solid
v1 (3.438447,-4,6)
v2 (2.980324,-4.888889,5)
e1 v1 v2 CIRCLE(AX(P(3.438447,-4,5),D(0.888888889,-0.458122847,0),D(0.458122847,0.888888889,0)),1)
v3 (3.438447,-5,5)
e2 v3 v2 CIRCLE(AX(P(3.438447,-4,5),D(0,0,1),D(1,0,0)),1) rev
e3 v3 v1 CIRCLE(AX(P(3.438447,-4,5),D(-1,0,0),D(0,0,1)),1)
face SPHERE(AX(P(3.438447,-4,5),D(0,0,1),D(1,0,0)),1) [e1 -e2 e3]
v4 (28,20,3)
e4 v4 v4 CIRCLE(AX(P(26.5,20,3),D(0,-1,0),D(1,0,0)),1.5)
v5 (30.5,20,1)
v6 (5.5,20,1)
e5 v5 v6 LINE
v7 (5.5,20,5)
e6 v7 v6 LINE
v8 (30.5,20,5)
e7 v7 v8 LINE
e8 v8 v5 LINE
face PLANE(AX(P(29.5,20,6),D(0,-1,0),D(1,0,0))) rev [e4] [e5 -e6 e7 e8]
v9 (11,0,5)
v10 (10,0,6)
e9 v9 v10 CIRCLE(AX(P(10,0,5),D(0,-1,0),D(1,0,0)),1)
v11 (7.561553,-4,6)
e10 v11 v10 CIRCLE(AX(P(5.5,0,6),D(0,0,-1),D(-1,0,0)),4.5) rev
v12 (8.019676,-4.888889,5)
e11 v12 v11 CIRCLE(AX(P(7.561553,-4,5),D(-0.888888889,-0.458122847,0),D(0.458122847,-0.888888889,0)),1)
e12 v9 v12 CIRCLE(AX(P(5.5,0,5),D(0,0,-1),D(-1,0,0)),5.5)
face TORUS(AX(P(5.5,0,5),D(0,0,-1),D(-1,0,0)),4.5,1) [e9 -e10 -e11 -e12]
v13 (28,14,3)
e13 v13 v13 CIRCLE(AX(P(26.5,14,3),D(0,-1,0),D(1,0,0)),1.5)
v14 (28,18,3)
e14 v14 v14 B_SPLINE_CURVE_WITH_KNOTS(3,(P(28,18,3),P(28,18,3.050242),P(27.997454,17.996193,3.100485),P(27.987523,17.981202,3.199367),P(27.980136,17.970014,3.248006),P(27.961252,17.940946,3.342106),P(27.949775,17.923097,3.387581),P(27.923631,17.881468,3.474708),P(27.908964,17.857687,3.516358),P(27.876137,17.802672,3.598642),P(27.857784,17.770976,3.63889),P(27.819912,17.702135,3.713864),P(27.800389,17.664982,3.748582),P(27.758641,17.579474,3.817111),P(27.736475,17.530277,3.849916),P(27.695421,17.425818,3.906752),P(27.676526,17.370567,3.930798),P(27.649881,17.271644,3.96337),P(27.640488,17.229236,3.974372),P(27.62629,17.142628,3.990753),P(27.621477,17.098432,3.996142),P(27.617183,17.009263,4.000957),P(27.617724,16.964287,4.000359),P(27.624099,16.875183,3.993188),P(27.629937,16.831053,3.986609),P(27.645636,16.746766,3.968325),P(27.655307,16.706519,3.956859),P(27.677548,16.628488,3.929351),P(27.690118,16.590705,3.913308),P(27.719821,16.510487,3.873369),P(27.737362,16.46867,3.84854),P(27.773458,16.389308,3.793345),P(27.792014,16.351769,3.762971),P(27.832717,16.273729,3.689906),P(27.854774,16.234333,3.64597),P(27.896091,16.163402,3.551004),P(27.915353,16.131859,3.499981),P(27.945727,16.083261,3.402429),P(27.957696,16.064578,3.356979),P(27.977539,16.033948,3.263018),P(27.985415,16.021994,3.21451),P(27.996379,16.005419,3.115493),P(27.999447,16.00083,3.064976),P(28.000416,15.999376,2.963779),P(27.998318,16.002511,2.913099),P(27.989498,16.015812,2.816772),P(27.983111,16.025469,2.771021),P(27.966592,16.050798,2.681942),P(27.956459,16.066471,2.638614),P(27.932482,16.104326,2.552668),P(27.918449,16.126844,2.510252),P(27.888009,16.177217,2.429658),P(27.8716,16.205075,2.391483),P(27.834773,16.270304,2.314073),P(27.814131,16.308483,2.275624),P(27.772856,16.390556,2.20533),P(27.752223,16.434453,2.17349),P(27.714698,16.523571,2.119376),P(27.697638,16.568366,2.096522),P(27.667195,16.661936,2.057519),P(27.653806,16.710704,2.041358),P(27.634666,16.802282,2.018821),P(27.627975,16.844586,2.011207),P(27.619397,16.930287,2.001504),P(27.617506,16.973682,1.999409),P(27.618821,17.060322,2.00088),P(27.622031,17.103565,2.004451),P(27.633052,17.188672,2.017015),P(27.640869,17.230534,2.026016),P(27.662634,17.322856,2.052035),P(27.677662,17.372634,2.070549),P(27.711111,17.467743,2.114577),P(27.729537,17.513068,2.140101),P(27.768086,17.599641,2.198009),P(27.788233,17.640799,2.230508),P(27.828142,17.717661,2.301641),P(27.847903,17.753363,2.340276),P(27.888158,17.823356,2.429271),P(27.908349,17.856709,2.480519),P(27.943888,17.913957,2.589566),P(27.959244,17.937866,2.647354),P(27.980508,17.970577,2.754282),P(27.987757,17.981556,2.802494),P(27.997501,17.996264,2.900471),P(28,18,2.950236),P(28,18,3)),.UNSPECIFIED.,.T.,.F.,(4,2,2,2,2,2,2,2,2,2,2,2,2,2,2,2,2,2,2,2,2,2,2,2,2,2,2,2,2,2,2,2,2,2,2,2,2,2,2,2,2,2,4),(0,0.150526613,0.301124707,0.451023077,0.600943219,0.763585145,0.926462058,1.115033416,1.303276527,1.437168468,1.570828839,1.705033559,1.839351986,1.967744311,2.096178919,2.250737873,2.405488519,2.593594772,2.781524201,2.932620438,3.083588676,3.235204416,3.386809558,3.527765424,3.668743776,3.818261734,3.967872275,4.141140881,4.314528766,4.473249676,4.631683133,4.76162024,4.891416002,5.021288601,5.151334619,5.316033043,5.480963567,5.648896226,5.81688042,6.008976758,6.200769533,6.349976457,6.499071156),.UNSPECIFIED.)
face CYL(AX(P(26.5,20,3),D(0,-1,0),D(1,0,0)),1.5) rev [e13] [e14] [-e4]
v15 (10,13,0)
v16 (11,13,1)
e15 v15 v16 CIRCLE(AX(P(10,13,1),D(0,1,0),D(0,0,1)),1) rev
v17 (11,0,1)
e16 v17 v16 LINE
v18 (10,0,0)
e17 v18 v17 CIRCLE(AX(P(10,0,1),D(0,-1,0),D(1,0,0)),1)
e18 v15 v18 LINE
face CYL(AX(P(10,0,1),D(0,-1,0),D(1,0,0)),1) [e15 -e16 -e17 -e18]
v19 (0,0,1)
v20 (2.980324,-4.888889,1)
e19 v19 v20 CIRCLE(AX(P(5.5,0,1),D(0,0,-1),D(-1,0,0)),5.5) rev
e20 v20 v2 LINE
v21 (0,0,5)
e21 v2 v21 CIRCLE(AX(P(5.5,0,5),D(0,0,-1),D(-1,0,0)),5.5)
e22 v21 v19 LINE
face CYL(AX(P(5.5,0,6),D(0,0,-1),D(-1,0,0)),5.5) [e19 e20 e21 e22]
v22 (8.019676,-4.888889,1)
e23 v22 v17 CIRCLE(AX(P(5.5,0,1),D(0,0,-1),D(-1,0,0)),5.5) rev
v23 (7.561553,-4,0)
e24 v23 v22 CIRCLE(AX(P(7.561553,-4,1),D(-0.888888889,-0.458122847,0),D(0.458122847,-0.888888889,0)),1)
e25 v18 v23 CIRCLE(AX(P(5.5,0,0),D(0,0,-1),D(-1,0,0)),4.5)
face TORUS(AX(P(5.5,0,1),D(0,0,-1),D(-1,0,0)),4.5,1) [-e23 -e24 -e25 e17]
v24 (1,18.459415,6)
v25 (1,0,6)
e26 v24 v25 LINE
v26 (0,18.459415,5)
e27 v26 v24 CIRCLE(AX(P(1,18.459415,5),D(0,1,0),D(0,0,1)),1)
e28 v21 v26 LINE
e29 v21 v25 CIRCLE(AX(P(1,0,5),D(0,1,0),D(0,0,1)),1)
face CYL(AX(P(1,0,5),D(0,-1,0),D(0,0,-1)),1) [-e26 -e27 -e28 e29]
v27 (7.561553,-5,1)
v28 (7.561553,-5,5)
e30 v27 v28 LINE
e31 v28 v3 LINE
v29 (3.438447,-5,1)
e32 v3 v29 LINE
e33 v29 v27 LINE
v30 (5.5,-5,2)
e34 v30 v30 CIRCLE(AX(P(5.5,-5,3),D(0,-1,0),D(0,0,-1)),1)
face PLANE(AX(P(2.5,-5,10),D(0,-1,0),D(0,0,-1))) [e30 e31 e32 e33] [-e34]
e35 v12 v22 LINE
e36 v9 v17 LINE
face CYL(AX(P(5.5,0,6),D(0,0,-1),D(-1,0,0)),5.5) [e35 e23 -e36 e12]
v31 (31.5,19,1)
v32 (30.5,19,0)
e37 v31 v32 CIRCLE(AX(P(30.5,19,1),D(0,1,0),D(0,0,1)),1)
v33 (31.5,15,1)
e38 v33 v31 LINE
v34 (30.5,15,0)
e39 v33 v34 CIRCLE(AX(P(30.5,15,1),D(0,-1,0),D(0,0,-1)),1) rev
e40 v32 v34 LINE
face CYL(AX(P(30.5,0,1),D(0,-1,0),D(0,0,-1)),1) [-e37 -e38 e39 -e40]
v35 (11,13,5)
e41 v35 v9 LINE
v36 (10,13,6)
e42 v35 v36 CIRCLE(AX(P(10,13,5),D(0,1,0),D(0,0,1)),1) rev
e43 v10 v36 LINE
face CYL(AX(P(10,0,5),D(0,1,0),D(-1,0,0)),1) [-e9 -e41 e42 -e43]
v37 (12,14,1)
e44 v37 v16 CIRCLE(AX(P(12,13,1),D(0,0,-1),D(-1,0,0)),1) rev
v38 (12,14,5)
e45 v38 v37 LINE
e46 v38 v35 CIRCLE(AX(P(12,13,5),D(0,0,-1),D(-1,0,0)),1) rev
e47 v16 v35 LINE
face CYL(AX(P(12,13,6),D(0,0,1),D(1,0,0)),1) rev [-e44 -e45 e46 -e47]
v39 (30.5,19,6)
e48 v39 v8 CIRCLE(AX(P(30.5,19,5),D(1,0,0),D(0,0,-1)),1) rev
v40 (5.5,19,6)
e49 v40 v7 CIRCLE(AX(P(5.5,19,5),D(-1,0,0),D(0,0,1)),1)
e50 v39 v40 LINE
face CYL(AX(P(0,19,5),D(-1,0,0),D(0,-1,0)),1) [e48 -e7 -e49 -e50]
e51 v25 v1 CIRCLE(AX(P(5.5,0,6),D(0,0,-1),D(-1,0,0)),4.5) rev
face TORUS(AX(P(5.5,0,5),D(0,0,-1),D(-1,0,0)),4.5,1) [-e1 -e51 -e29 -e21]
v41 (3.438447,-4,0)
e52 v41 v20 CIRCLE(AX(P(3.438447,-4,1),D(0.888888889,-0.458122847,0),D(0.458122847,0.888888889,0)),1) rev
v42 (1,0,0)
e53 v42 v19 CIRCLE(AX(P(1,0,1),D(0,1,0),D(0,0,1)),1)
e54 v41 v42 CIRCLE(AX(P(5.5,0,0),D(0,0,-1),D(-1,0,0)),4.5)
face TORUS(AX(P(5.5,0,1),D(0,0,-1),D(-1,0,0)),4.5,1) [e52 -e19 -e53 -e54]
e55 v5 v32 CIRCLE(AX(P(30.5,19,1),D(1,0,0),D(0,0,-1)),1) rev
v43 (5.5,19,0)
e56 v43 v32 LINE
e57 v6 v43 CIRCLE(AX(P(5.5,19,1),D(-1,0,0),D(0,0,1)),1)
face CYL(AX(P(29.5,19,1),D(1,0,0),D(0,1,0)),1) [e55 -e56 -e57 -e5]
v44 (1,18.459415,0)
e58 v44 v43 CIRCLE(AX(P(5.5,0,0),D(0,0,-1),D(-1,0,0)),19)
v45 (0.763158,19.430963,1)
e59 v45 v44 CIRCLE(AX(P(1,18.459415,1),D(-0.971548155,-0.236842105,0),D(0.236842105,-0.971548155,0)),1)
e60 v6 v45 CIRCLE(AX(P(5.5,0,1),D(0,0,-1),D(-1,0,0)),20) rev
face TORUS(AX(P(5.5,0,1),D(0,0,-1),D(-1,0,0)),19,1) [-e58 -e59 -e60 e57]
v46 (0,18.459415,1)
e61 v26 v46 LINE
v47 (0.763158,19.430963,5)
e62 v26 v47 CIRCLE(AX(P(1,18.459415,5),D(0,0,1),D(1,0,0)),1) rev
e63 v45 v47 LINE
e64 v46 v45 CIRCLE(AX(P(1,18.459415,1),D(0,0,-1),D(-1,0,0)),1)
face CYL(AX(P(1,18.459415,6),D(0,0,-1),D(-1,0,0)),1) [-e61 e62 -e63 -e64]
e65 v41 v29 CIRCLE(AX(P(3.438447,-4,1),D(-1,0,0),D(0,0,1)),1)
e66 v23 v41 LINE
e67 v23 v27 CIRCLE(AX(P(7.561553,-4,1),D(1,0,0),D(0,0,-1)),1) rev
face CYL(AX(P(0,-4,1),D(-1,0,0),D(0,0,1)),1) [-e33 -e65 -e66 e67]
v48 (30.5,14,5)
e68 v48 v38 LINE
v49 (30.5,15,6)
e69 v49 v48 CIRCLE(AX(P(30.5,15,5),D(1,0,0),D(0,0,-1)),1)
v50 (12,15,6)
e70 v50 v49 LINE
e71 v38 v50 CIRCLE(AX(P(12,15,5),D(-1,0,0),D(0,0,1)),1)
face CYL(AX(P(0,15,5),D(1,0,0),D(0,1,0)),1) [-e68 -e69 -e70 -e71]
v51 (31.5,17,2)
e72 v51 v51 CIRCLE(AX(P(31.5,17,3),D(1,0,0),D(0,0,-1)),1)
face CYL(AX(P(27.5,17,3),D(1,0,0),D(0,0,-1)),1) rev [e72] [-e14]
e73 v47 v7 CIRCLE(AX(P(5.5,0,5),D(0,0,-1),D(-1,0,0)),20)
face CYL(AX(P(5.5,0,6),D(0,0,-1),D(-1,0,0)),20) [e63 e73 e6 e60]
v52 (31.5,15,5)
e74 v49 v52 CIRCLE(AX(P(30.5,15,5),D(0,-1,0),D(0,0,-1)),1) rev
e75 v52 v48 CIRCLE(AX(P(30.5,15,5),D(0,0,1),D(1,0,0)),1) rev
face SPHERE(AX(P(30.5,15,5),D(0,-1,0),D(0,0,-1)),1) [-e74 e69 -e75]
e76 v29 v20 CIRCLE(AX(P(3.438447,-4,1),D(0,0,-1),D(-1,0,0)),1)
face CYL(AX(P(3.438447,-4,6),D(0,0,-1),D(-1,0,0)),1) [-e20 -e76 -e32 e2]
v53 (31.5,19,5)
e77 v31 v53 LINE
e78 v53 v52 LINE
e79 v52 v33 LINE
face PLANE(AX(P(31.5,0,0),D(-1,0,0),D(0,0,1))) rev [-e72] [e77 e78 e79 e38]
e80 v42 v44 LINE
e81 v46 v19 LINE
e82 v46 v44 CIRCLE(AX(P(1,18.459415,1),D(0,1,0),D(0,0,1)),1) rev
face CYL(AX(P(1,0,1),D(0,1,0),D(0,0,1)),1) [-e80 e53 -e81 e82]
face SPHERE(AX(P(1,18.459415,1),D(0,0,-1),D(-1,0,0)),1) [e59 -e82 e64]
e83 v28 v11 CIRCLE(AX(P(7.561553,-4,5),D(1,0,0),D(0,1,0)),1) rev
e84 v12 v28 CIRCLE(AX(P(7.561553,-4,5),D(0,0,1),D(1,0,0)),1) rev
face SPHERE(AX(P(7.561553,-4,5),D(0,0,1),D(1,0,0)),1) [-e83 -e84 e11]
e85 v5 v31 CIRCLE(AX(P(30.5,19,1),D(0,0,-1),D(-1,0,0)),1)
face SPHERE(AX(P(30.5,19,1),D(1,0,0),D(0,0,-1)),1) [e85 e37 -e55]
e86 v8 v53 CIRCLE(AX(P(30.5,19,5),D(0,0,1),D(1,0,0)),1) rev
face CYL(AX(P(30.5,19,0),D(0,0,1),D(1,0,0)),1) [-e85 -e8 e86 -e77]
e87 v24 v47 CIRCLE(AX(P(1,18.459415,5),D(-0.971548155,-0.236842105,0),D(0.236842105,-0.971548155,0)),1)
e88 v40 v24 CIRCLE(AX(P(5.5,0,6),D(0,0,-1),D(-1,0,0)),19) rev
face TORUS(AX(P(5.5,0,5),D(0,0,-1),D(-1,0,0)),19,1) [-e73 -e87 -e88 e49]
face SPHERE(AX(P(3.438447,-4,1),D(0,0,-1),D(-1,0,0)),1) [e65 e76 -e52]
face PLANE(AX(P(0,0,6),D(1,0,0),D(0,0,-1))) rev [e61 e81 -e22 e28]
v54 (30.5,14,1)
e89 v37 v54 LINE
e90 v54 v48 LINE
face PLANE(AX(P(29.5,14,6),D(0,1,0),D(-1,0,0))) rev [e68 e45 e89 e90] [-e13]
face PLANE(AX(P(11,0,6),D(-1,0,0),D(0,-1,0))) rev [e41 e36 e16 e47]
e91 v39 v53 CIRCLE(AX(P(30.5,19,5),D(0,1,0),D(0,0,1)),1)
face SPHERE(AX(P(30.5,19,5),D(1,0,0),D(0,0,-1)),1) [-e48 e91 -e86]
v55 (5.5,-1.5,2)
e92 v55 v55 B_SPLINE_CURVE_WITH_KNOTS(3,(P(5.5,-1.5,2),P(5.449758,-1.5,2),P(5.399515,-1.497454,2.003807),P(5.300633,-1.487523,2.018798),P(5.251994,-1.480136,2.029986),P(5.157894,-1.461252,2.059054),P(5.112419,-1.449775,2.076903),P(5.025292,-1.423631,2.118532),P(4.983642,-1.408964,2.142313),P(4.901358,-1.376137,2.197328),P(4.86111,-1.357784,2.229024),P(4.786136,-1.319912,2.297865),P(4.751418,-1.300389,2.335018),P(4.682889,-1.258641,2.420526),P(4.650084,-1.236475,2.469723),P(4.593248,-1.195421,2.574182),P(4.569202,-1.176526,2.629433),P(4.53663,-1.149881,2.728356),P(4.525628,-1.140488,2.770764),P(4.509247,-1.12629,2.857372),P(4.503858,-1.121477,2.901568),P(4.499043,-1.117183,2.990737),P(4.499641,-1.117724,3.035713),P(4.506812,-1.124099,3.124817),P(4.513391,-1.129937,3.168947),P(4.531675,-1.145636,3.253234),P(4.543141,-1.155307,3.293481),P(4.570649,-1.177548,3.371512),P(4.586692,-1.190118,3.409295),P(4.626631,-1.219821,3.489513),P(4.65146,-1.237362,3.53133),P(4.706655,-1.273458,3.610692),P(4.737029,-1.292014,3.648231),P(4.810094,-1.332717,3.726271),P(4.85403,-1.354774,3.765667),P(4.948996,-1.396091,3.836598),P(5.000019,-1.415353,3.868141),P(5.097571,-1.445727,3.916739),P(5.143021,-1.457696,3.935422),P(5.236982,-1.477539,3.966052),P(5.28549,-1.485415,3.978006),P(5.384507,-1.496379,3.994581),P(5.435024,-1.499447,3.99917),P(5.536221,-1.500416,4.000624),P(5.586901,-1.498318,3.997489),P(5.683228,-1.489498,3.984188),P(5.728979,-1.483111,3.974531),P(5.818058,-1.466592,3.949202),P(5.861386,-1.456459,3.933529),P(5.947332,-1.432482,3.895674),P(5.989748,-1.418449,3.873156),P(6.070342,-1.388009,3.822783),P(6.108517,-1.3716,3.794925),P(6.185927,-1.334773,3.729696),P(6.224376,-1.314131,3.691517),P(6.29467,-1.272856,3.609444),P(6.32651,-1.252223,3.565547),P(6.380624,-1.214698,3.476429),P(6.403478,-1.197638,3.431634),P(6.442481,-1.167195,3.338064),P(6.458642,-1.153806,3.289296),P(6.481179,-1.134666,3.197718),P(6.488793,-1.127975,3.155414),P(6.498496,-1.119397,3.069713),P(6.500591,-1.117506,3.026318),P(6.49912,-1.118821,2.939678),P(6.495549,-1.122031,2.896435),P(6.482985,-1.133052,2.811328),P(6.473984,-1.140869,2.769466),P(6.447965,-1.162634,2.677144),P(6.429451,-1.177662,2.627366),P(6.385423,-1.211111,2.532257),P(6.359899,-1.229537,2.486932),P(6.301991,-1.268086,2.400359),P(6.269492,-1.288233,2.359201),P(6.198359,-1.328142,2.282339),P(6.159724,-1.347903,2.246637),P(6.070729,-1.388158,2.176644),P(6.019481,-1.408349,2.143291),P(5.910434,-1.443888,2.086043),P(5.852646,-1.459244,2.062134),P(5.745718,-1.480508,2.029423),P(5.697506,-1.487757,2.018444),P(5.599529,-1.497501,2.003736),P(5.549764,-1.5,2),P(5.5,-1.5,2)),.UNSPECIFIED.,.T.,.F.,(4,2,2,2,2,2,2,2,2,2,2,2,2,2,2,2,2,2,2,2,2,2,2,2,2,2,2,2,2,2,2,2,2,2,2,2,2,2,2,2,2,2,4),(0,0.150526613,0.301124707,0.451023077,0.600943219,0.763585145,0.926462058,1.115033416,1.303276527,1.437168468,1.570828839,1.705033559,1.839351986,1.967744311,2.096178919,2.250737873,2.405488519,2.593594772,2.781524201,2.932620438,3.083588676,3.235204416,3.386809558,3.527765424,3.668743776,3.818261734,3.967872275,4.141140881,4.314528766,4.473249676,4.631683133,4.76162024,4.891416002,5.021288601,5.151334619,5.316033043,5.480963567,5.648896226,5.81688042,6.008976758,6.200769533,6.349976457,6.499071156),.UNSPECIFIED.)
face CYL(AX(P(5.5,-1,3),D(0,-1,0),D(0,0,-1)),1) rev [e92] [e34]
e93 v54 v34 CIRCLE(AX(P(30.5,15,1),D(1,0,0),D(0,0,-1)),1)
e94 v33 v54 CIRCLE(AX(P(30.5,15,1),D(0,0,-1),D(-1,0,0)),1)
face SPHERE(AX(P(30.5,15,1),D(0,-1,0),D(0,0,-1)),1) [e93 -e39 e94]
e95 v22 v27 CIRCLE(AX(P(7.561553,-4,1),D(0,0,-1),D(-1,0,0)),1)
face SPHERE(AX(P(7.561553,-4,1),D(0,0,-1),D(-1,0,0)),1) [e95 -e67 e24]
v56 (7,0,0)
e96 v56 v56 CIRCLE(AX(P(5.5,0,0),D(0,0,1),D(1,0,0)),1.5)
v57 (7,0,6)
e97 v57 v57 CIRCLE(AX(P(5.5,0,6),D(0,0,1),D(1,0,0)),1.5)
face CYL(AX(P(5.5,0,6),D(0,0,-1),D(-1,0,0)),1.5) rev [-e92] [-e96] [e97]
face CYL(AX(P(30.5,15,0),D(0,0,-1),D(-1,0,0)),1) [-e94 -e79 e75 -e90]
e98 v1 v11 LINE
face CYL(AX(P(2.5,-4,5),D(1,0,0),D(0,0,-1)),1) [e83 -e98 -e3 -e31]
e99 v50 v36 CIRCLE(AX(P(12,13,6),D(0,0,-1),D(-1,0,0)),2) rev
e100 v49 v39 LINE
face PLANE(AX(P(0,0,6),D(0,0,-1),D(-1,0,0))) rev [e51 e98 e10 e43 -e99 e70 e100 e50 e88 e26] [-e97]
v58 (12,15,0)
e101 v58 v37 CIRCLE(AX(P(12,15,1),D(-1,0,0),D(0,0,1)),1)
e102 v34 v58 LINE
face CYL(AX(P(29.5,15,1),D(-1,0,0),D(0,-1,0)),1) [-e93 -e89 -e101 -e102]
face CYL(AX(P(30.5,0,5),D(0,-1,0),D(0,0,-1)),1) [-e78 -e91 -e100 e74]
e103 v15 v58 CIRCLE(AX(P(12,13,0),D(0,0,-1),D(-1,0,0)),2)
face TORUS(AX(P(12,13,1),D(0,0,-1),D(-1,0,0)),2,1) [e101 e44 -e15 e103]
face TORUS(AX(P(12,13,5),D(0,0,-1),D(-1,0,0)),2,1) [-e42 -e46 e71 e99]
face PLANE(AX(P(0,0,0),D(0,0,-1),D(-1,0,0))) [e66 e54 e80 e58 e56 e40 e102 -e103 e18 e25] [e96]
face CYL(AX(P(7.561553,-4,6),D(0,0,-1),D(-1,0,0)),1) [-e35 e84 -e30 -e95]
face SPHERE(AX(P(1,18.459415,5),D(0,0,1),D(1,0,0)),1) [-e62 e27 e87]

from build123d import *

# Parameters (mm, degrees)
SKETCH_1_W          = 11
SKETCH_1_H          = 20
EXTRUDE_1_DEPTH     = 6
CUT_EXTRUDE_1_DEPTH = 6
SKETCH_3_R          = 5.5
EXTRUDE_2_DEPTH     = 6
SKETCH_4_W          = 24
SKETCH_4_H          = 6
EXTRUDE_3_DEPTH     = 6
SKETCH_6_R          = 1.5
CUT_EXTRUDE_3_DEPTH = 6
SKETCH_7_R          = 1.5
CUT_EXTRUDE_4_DEPTH = 6
SKETCH_5_W          = 6
SKETCH_5_H          = 0.5
CUT_EXTRUDE_5_DEPTH = 10
SKETCH_14_R         = 1
CUT_EXTRUDE_6_DEPTH = 4
SKETCH_15_W         = 6
SKETCH_15_H         = 6
EXTRUDE_4_DEPTH     = 2
SKETCH_16_R         = 1
CUT_EXTRUDE_7_DEPTH = 4
FILLET_2_R          = 1


# Read off the part's stored shape, not the designer's step: 切除-拉伸1
with BuildPart() as part:
    # 草图1 → 凸台-拉伸1 (new body)
    with BuildSketch(Plane.XY):
        with Locations((5.5, 10)):
            Rectangle(SKETCH_1_W, SKETCH_1_H)
    extrude(amount=EXTRUDE_1_DEPTH)

    # 切除-拉伸1 outline → 切除-拉伸1 (cut)
    with BuildSketch(Plane.XY):
        with BuildLine():
            Line((0, 20), (0, 19.228884523))
            ThreePointArc((0, 19.228884523), (2.723103392, 19.806282974), (5.5, 20))
            Line((5.5, 20), (0, 20))
        make_face()
        with BuildLine():
            Line((11, 20), (5.5, 20))
            ThreePointArc((5.5, 20), (8.276896608, 19.806282974), (11, 19.228884523))
            Line((11, 19.228884523), (11, 20))
        make_face()
    extrude(amount=CUT_EXTRUDE_1_DEPTH, mode=Mode.SUBTRACT)

    # 草图3 → 凸台-拉伸2 (add)
    with BuildSketch(Plane.XY):
        with Locations((5.5, 0)):
            Circle(SKETCH_3_R)
    extrude(amount=EXTRUDE_2_DEPTH)

    # 草图4 → 凸台-拉伸3 (add)
    with BuildSketch(Plane.XY):
        with Locations((17.5, 17)):
            Rectangle(SKETCH_4_W, SKETCH_4_H)
    extrude(amount=EXTRUDE_3_DEPTH)

    # 草图6 → 切除-拉伸3 (cut)
    with BuildSketch(Plane.XY):
        with Locations((5.5, 0)):
            Circle(SKETCH_6_R)
    extrude(amount=CUT_EXTRUDE_3_DEPTH, mode=Mode.SUBTRACT)

    # 草图7 → 切除-拉伸4 (cut)
    with BuildSketch(Plane.XZ.offset(-14)):
        with Locations((26.5, 3)):
            Circle(SKETCH_7_R)
    extrude(amount=-CUT_EXTRUDE_4_DEPTH, mode=Mode.SUBTRACT)

    # 草图5 → 切除-拉伸5 (cut)
    with BuildSketch(Plane.XY):
        with Locations((5.5, -5.25)):
            Rectangle(SKETCH_5_W, SKETCH_5_H)
    extrude(amount=CUT_EXTRUDE_5_DEPTH, mode=Mode.SUBTRACT)

    # 草图14 → 切除-拉伸6 (cut)
    with BuildSketch(Plane(origin=(0, -5, 0), x_dir=(-1, 0, 0), z_dir=(0, -1, 0))):
        with Locations(Location((-5.5, -3, 0), (0, 0, 90))):
            Circle(SKETCH_14_R)
    extrude(amount=-CUT_EXTRUDE_6_DEPTH, mode=Mode.SUBTRACT)

    # 草图15 → 凸台-拉伸4 (add)
    with BuildSketch(Plane(origin=(29.5, 0, 0), x_dir=(0, 0, -1), z_dir=(1, 0, 0))):
        with Locations((-3, 17)):
            Rectangle(SKETCH_15_W, SKETCH_15_H)
    extrude(amount=EXTRUDE_4_DEPTH)

    # 草图16 → 切除-拉伸7 (cut)
    with BuildSketch(Plane(origin=(31.5, 0, 0), x_dir=(0, 0, -1), z_dir=(1, 0, 0))):
        with Locations((-3, 17)):
            Circle(SKETCH_16_R)
    extrude(amount=-CUT_EXTRUDE_7_DEPTH, mode=Mode.SUBTRACT)

    # 圆角2
    fillet_2_edges = [part.edges().sort_by_distance(p)[0] for p in [
        (31.5, 17, 0),
        (31.5, 20, 3),
        (31.5, 17, 6),
        (31.5, 14, 3),
        (11, 7, 6),
        (0, 9.614442262, 0),
        (0, 9.614442262, 6),
        (0, 19.228884523, 3),
        (0.871172764, -2.970514841, 0),
        (0.871172764, -2.970514841, 6),
        (2.723103392, 19.806282974, 6),
        (2.723103392, 19.806282974, 0),
        (11, 14, 3),
        (11, 7, 0),
        (21.25, 14, 0),
        (21.25, 14, 6),
        (18.5, 20, 6),
        (18.5, 20, 0),
        (10.128827236, -2.970514841, 6),
        (10.128827236, -2.970514841, 0),
        (7.791287847, -5, 3),
        (3.208712153, -5, 3),
        (5.5, -5, 0),
        (5.5, -5, 6),
    ]]
    fillet(fillet_2_edges, radius=FILLET_2_R)


solid = part.part
